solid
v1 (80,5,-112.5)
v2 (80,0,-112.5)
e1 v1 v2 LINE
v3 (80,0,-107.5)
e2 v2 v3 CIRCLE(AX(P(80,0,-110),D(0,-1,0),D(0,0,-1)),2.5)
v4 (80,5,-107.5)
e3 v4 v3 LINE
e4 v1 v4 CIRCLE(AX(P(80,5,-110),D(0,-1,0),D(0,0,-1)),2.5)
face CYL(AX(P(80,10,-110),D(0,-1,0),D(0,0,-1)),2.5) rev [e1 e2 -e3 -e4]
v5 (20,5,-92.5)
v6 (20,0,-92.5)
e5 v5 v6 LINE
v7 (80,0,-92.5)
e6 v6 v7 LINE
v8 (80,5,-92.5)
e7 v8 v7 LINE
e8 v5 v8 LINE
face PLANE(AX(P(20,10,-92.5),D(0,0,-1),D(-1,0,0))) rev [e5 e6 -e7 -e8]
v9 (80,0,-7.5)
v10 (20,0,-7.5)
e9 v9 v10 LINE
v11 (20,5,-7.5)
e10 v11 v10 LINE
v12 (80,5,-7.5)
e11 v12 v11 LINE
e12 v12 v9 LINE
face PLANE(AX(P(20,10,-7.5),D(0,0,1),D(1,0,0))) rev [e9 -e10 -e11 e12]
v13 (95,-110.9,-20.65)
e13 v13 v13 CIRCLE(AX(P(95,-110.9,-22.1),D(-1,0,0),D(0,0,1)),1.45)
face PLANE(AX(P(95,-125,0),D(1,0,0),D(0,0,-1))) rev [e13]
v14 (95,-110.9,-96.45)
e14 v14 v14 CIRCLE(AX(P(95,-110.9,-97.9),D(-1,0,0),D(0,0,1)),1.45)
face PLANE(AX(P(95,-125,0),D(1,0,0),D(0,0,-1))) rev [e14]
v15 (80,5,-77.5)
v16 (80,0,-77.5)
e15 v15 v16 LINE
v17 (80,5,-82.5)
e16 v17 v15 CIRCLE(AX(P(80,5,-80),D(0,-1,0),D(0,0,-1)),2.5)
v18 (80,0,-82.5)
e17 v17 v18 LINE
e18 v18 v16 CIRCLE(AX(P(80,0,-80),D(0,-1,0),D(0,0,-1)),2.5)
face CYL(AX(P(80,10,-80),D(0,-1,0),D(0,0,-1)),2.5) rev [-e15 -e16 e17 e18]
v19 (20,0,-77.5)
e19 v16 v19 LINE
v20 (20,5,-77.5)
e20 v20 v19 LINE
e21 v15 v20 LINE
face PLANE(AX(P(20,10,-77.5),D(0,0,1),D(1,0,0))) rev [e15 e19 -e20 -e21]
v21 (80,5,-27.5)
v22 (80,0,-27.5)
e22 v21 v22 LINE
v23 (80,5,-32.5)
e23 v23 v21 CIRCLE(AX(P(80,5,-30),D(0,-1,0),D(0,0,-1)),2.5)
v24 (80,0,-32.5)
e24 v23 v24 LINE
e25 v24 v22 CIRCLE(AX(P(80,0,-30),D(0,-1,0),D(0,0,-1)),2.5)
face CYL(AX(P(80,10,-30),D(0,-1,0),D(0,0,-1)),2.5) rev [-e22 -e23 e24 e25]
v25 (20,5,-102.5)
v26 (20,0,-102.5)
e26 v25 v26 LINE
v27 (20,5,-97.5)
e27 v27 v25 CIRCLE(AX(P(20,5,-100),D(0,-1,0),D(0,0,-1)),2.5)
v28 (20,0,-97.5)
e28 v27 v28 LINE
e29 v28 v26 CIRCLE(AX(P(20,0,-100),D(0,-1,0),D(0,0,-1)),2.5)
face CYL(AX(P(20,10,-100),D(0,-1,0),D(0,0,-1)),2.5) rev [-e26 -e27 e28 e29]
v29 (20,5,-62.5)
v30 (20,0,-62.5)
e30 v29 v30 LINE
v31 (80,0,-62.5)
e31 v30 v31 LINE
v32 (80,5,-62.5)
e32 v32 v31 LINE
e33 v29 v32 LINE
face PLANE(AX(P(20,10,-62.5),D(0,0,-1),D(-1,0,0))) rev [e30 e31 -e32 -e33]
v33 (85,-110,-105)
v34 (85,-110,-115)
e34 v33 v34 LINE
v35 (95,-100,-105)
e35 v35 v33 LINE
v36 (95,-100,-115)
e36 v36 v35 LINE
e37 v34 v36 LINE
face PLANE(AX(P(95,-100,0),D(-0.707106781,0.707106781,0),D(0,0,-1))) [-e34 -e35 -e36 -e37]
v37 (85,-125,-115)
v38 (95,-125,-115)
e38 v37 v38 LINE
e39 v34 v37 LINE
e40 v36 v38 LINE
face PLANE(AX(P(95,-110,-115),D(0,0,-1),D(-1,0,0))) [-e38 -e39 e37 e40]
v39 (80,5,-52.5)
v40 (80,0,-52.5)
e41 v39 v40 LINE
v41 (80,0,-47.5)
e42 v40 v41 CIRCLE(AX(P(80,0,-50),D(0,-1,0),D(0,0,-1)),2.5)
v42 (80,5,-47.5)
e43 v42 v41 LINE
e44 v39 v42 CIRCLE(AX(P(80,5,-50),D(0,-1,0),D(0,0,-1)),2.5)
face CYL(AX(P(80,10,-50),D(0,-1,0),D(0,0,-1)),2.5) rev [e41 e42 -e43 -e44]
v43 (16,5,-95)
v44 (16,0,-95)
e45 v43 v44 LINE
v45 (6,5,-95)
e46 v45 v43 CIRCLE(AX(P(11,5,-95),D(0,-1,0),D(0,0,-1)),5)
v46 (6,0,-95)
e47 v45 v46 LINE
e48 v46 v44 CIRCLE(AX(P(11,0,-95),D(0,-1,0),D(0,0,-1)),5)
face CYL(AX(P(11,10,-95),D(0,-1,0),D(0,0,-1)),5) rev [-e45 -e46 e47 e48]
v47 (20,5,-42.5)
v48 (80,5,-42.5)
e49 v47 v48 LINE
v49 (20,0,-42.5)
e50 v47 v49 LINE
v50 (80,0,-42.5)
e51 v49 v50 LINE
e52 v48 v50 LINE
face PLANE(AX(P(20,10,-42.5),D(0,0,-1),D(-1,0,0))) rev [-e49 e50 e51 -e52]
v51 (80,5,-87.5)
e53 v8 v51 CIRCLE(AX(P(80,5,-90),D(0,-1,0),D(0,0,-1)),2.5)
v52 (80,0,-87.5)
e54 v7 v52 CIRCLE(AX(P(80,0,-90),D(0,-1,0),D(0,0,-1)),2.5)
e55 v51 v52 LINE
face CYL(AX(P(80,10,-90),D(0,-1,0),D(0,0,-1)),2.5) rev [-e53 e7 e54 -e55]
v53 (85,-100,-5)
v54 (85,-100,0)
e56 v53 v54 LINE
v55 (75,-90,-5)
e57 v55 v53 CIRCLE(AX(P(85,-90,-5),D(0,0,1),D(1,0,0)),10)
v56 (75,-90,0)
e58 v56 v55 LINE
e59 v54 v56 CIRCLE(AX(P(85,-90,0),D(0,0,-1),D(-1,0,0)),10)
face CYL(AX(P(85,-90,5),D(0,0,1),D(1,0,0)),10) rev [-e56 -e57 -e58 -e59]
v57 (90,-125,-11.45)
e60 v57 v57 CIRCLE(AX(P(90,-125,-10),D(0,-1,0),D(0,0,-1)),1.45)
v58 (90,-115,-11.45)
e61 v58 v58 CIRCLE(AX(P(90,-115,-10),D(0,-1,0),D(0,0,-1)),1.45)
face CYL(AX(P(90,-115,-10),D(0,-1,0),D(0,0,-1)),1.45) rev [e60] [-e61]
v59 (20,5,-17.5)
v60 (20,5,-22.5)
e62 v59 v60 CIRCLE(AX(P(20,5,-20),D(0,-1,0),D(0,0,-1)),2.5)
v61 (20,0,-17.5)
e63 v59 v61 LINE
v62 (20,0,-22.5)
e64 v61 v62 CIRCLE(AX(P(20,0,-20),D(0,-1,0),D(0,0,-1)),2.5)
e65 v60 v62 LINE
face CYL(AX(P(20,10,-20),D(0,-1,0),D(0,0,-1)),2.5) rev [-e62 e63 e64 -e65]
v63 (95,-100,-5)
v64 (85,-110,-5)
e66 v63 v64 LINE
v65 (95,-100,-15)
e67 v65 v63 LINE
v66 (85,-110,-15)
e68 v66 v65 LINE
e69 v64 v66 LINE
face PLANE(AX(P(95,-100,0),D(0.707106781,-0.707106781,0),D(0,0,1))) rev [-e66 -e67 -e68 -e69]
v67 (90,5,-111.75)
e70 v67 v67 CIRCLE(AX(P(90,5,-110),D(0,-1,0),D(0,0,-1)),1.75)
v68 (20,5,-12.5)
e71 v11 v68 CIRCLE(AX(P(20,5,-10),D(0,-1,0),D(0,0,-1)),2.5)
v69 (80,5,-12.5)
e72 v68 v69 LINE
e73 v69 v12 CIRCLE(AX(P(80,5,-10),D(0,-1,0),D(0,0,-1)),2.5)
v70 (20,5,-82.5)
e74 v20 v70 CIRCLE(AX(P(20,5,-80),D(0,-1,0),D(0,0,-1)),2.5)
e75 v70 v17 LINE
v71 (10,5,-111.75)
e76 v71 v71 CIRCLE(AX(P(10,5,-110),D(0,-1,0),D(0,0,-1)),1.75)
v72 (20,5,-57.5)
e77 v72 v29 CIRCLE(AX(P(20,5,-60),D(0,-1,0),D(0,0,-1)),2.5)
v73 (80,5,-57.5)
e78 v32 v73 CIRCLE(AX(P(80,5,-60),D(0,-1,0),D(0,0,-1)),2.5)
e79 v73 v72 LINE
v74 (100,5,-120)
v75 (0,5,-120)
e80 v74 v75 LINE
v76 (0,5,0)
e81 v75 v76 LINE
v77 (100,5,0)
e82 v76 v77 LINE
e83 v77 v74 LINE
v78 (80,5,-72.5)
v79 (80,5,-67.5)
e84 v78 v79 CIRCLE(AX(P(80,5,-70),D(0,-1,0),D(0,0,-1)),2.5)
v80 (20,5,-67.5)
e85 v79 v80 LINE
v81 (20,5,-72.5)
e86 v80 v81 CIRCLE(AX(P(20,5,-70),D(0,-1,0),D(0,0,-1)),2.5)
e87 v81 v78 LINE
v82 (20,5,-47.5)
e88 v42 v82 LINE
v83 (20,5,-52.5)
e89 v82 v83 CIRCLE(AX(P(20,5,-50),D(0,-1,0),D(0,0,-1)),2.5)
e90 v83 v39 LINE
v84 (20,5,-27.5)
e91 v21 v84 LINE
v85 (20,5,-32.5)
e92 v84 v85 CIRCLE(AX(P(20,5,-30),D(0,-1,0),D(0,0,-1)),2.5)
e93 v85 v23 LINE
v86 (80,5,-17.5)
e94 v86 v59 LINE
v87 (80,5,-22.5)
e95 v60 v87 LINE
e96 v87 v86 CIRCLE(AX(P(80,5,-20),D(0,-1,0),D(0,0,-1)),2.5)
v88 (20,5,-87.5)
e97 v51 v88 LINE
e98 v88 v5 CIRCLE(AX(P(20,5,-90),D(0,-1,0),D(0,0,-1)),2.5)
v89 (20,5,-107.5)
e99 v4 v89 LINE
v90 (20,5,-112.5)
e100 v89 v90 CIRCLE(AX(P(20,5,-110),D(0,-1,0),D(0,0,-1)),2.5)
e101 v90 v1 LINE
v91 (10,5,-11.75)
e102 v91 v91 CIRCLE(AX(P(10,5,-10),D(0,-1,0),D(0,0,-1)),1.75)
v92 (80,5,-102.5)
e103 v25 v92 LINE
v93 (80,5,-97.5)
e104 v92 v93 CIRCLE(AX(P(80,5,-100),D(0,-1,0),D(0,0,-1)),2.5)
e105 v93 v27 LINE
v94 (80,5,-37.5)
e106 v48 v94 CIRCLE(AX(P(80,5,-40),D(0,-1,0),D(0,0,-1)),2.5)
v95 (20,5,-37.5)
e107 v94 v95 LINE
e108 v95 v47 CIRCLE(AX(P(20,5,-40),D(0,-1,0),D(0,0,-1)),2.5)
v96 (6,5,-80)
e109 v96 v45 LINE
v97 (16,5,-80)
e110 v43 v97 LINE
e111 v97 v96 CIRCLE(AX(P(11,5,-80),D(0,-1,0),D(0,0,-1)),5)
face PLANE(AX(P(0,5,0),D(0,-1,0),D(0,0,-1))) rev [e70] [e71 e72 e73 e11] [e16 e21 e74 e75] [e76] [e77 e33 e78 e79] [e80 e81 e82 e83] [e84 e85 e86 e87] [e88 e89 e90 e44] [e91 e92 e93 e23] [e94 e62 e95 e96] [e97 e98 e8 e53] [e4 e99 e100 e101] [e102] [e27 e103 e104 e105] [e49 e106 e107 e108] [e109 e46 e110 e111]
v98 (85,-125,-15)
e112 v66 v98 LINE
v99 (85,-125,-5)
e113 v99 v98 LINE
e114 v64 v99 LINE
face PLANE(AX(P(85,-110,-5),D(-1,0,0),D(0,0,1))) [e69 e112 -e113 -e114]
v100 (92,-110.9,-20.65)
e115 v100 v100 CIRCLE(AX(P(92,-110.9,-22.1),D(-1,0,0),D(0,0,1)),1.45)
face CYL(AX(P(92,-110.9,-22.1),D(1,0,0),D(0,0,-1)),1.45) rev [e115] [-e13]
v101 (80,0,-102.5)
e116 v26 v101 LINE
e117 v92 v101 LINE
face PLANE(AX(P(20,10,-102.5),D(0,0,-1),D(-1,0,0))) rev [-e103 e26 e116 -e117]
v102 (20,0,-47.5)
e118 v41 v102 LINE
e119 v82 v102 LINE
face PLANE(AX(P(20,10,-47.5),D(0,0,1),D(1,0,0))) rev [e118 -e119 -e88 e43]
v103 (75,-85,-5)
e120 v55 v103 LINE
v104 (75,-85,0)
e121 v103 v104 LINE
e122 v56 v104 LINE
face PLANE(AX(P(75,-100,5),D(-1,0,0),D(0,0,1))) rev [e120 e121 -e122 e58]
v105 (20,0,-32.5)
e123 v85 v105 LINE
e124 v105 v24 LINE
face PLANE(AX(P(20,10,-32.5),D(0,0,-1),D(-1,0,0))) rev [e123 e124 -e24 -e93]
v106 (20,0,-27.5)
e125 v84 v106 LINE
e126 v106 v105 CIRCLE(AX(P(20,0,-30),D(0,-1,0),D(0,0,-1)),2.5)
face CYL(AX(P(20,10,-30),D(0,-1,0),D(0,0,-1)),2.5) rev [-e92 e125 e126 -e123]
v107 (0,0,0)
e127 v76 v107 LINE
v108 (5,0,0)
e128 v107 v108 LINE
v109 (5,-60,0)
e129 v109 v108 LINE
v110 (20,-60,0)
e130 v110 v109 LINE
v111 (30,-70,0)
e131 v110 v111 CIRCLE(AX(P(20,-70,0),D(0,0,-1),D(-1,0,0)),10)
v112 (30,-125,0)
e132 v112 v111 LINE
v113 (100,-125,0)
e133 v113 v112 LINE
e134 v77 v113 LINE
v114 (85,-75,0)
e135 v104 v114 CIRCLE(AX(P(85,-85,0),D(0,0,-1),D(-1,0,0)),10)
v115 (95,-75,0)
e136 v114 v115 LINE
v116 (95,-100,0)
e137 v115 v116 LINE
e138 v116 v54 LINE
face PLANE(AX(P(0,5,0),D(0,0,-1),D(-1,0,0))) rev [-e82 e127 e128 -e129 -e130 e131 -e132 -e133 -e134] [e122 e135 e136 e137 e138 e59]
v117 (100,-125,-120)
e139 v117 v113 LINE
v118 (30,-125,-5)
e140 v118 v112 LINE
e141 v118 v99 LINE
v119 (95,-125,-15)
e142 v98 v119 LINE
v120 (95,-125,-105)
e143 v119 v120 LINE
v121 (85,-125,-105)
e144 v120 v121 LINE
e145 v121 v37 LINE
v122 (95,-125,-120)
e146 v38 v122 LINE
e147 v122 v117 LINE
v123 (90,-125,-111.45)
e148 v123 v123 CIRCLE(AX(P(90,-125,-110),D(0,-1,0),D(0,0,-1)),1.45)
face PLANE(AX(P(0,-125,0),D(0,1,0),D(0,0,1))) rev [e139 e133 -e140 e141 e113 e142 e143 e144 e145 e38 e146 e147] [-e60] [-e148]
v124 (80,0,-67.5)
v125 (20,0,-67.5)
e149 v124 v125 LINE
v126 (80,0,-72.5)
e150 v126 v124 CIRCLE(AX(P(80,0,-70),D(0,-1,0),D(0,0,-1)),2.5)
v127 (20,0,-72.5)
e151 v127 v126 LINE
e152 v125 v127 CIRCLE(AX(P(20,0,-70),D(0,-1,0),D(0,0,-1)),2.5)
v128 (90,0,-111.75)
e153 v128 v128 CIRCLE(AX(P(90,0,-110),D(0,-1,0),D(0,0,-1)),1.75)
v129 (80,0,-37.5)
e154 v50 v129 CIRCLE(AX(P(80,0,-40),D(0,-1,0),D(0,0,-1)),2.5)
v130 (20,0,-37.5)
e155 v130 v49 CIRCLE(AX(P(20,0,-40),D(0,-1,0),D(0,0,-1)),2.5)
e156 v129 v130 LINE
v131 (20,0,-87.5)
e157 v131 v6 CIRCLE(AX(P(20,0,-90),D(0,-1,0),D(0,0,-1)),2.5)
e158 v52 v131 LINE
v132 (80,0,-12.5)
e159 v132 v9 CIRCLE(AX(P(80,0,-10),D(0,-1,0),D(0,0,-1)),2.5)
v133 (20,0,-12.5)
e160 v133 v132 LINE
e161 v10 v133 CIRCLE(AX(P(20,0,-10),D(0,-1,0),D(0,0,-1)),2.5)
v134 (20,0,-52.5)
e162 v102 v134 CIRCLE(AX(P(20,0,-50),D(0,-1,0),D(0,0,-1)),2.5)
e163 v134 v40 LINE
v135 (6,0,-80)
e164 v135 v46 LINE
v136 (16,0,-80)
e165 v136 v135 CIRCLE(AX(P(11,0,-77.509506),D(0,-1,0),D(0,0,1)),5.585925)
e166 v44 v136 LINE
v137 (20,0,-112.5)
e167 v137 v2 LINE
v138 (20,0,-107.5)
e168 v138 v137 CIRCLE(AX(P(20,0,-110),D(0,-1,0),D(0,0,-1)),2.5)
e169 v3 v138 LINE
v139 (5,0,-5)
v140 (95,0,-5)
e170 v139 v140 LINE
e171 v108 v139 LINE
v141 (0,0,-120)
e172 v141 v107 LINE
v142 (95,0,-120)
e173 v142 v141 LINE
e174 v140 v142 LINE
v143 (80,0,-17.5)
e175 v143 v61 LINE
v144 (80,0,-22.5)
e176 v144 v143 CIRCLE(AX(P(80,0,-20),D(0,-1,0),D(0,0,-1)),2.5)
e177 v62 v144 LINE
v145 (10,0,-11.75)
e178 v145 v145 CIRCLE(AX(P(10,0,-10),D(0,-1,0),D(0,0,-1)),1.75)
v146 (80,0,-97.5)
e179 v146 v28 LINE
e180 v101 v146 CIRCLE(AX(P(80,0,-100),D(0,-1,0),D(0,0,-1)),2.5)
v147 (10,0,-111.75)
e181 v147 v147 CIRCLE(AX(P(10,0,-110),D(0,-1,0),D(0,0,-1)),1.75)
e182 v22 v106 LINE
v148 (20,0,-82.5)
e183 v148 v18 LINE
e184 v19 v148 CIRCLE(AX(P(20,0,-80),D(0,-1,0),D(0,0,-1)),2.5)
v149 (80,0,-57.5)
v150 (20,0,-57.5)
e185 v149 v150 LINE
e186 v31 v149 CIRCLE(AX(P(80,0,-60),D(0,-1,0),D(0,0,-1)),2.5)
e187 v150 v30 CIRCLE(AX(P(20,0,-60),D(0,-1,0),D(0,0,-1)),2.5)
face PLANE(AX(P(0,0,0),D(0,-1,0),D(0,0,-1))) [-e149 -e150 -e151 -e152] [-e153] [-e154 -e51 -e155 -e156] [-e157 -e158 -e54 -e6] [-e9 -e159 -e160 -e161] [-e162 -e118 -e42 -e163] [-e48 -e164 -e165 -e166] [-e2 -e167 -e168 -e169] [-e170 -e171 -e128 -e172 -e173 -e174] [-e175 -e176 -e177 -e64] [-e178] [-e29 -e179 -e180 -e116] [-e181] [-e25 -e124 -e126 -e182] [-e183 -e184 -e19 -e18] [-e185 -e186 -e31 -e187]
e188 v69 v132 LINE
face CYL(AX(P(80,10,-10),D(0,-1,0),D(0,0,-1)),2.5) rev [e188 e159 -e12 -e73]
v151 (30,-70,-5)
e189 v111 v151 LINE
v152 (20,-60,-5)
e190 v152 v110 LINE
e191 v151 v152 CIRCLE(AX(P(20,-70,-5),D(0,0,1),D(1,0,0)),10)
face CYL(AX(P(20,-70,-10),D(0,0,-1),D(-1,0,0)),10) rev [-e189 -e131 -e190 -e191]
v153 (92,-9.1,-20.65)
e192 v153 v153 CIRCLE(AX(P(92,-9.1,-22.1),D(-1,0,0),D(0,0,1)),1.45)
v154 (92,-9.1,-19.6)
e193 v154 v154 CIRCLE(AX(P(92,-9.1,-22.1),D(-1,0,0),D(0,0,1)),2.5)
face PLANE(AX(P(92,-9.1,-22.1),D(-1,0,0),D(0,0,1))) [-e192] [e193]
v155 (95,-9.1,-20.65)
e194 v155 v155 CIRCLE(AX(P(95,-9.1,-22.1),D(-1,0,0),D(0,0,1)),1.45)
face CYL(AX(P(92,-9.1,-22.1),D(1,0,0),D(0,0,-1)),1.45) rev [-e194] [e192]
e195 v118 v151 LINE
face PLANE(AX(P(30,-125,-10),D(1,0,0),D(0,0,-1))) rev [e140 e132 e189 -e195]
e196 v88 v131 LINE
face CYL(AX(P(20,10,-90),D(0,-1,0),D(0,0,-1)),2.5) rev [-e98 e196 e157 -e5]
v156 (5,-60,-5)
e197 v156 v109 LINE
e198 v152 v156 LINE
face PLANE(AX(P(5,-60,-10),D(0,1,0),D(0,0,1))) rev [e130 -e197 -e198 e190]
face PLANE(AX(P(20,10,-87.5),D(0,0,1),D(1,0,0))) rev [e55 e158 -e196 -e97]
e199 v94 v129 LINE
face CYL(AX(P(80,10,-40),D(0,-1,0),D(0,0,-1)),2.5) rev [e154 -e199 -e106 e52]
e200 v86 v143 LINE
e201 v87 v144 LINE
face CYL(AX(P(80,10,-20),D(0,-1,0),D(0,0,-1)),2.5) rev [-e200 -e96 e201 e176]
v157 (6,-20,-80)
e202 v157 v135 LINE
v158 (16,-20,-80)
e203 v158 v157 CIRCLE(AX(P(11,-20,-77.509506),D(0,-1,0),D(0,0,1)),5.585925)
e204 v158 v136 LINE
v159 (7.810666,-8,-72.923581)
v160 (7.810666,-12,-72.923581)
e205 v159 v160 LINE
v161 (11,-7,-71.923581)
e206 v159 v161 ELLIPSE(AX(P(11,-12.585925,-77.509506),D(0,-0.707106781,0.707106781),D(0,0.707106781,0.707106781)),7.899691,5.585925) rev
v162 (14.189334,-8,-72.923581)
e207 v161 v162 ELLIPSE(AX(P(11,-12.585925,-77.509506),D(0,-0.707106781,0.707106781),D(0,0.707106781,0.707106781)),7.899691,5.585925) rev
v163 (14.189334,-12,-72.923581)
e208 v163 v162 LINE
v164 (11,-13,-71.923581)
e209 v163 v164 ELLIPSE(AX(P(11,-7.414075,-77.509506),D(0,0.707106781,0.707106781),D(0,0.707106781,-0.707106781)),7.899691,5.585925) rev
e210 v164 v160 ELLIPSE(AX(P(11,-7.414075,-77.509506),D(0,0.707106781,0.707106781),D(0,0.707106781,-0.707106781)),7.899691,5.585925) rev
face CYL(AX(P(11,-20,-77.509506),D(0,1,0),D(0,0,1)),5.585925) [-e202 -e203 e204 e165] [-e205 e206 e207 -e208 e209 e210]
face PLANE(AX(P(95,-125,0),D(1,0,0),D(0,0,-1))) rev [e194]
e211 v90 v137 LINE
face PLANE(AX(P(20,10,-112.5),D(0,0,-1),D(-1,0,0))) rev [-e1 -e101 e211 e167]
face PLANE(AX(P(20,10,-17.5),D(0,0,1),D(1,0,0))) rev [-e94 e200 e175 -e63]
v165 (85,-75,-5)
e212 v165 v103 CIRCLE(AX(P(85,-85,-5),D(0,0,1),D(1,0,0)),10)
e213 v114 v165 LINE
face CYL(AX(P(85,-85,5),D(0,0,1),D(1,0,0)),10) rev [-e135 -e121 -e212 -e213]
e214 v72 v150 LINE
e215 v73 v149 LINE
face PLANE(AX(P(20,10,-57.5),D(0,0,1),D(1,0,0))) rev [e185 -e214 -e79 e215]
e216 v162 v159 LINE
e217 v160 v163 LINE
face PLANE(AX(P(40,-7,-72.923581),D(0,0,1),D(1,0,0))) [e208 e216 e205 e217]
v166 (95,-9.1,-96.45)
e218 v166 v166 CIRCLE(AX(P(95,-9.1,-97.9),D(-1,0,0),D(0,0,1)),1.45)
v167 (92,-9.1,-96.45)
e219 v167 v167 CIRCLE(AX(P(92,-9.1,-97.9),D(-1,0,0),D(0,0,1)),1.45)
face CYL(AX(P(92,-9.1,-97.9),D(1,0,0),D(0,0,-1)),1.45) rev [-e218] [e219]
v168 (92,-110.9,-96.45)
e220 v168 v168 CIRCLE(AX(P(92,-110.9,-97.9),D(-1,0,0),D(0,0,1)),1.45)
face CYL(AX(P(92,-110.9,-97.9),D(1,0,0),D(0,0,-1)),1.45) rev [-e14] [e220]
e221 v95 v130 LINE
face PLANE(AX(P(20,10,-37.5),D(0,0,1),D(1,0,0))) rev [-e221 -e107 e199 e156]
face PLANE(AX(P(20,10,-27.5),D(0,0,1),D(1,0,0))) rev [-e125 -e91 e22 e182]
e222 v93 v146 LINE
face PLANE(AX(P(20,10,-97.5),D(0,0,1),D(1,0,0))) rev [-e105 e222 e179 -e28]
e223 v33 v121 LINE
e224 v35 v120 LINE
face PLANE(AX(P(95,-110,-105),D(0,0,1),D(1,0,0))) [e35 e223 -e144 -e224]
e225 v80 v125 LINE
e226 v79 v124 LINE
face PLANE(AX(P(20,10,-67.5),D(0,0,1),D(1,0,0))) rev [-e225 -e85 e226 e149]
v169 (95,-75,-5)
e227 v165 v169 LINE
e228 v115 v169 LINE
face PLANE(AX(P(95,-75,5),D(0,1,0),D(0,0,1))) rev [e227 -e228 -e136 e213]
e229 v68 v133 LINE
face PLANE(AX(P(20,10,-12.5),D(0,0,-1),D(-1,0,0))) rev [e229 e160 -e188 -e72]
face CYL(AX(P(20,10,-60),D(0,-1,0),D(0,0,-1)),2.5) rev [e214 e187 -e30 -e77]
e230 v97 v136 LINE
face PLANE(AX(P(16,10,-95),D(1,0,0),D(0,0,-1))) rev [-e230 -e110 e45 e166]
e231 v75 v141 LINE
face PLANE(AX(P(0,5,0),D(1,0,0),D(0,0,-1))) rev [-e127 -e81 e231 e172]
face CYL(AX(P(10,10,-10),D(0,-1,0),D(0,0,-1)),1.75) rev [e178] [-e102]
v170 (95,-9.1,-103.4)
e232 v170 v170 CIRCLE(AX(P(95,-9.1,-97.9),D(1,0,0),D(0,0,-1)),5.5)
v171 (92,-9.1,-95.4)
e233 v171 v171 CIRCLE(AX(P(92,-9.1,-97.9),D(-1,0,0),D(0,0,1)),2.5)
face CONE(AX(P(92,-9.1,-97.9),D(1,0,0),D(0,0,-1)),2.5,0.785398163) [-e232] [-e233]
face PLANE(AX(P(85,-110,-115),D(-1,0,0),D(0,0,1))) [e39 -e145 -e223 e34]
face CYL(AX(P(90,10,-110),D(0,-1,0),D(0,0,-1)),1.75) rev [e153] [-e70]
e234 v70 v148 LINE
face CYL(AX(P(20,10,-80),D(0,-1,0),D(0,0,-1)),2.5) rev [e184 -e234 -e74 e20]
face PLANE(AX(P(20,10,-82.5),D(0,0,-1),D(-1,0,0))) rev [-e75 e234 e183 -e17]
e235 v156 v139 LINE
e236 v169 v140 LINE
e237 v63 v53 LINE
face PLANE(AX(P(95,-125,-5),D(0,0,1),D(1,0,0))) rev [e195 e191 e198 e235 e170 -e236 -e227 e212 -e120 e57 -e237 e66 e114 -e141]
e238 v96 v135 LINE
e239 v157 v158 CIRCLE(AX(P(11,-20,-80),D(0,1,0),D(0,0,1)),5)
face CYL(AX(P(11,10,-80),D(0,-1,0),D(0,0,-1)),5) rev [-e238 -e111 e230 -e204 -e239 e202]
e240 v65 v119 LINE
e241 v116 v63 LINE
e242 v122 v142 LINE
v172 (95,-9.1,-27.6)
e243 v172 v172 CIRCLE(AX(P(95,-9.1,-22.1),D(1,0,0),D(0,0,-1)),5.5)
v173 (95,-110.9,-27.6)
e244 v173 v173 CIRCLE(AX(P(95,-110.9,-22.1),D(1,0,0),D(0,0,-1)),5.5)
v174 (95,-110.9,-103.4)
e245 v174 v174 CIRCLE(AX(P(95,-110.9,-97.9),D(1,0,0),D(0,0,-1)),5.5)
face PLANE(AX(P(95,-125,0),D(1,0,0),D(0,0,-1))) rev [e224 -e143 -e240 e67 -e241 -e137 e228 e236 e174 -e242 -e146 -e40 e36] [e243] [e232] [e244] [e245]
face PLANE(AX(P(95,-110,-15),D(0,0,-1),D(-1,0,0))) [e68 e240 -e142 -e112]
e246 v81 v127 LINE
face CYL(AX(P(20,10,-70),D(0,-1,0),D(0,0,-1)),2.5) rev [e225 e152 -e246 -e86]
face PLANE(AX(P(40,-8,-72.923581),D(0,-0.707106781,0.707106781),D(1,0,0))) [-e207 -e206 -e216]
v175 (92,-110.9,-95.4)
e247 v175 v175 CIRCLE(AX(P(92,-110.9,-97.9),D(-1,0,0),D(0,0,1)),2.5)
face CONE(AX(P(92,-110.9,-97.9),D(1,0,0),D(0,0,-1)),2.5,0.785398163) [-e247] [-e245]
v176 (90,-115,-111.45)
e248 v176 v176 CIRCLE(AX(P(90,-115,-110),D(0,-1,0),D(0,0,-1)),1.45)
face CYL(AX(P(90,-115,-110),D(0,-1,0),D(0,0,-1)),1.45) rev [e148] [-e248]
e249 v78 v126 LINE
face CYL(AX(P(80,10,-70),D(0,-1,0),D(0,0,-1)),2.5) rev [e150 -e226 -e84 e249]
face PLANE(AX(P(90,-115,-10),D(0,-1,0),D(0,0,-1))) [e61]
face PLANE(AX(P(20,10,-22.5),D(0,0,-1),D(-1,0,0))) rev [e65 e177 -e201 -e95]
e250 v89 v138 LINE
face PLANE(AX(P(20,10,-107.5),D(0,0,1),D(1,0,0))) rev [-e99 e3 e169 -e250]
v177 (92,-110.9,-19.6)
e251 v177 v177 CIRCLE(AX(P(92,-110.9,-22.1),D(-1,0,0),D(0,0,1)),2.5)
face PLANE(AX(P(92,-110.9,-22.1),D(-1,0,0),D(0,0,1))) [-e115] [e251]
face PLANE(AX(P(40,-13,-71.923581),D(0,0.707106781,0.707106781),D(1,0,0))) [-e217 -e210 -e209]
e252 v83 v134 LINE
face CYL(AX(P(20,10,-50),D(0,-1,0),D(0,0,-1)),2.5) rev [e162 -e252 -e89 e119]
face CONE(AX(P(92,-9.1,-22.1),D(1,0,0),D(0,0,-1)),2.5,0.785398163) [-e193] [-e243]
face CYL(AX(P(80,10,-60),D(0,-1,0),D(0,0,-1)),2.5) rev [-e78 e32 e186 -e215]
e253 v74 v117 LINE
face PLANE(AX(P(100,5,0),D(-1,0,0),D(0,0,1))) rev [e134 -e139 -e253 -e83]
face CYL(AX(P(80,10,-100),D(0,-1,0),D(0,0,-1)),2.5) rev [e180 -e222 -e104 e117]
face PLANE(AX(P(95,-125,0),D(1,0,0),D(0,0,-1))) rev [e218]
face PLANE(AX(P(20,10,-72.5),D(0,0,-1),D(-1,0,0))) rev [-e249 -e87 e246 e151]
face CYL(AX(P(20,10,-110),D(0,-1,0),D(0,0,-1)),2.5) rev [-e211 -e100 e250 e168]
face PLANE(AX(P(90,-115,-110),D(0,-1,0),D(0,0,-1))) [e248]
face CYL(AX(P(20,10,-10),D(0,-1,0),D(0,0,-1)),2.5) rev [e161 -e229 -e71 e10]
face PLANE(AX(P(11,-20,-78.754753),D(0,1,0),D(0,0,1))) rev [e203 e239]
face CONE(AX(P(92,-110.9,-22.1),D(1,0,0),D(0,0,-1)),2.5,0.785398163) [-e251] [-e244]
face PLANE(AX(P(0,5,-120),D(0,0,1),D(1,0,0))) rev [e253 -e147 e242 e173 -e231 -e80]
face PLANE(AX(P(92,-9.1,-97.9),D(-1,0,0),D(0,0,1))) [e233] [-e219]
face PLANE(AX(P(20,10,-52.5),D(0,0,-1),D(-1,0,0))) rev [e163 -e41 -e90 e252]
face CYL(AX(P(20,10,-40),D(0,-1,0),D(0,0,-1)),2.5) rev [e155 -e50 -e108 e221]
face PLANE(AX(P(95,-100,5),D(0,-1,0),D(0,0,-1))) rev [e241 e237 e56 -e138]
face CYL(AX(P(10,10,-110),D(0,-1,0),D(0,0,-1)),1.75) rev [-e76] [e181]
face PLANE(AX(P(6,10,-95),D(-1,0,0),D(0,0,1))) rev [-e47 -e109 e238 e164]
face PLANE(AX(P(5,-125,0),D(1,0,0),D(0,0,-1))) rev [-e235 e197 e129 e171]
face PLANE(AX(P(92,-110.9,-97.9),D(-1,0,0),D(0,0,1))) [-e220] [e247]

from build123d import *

# Parameters (mm, degrees)
SKETCH2_W           = 100
SKETCH2_H           = 120
BOSS_EXTRUDE1_DEPTH = 5
SKETCH3_W           = 5
SKETCH3_H           = 120
BOSS_EXTRUDE2_DEPTH = 125
SKETCH4_W           = 90
SKETCH4_H           = 5
BOSS_EXTRUDE3_DEPTH = 125
SKETCH5_W           = 10
SKETCH5_H           = 10
BOSS_EXTRUDE4_DEPTH = 15
SKETCH6_R           = 1.45
CUT_EXTRUDE1_DEPTH  = 10
CHAMFER1_SIZE       = 10
CUT_EXTRUDE2_DEPTH  = 10
SKETCH8_W           = 25
SKETCH8_H           = 65
CUT_EXTRUDE3_DEPTH  = 10
SKETCH9_R           = 1.75
CUT_EXTRUDE4_DEPTH  = 10
CUT_EXTRUDE5_DEPTH  = 10
BOSS_EXTRUDE5_START = 20
BOSS_EXTRUDE5_DEPTH = 20
SKETCH12_W          = 1
SKETCH12_H          = 6
CUT_EXTRUDE6_DEPTH  = 40
CHAMFER2_SIZE       = 1
SKETCH13_R          = 2.5
SKETCH13_R_2        = 1.45
BOSS_EXTRUDE6_DEPTH = 3
CHAMFER3_SIZE       = 3
SKETCH14_W          = 20
SKETCH14_H          = 25
CUT_EXTRUDE7_DEPTH  = 10
FILLET1_R           = 10


with BuildPart() as part:
    # Sketch2 → Boss-Extrude1 (new body)
    with BuildSketch(Plane(origin=(0, 0, 0), x_dir=(1, 0, 0), z_dir=(0, 1, 0))):
        with Locations((50, 60)):
            Rectangle(SKETCH2_W, SKETCH2_H)
    extrude(amount=BOSS_EXTRUDE1_DEPTH)

    # Sketch3 → Boss-Extrude2 (add)
    with BuildSketch(Plane.XZ):
        with Locations((97.5, -60)):
            Rectangle(SKETCH3_W, SKETCH3_H)
    extrude(amount=BOSS_EXTRUDE2_DEPTH)

    # Sketch4 → Boss-Extrude3 (add)
    with BuildSketch(Plane.XZ):
        with Locations((50, -2.5)):
            Rectangle(SKETCH4_W, SKETCH4_H)
    extrude(amount=BOSS_EXTRUDE3_DEPTH)

    # Sketch5 → Boss-Extrude4 (add)
    with BuildSketch(Plane.XZ.offset(125)):
        with Locations((90, -10)):
            Rectangle(SKETCH5_W, SKETCH5_H)
        with Locations((90, -110)):
            Rectangle(SKETCH5_W, SKETCH5_H)
    extrude(amount=-BOSS_EXTRUDE4_DEPTH)

    # Sketch6 → Cut-Extrude1 (cut)
    with BuildSketch(Plane.XZ.offset(125)):
        with Locations(Location((90, -10, 0), (0, 0, 270))):
            Circle(SKETCH6_R)
        with Locations(Location((90, -110, 0), (0, 0, 270))):
            Circle(SKETCH6_R)
    extrude(amount=-CUT_EXTRUDE1_DEPTH, mode=Mode.SUBTRACT)

    # Chamfer1
    chamfer1_edges = [part.edges().sort_by_distance(p)[0] for p in [
        (95, -110, -110),
        (95, -110, -10),
    ]]
    chamfer(chamfer1_edges, length=CHAMFER1_SIZE - 0.0001)  # a hair under: the kernel refuses the full size

    # Sketch7 → Cut-Extrude2 (cut)
    with BuildSketch(Plane.XZ):
        with BuildLine():
            Line((20, -7.5), (80, -7.5))
            ThreePointArc((80, -7.5), (82.5, -10), (80, -12.5))
            Line((80, -12.5), (20, -12.5))
            ThreePointArc((20, -12.5), (17.5, -10), (20, -7.5))
        make_face()
        with BuildLine():
            Line((20, -17.5), (80, -17.5))
            ThreePointArc((80, -17.5), (82.5, -20), (80, -22.5))
            Line((80, -22.5), (20, -22.5))
            ThreePointArc((20, -22.5), (17.5, -20), (20, -17.5))
        make_face()
        with BuildLine():
            Line((20, -27.5), (80, -27.5))
            ThreePointArc((80, -27.5), (82.5, -30), (80, -32.5))
            Line((80, -32.5), (20, -32.5))
            ThreePointArc((20, -32.5), (17.5, -30), (20, -27.5))
        make_face()
        with BuildLine():
            Line((20, -37.5), (80, -37.5))
            ThreePointArc((80, -37.5), (82.5, -40), (80, -42.5))
            Line((80, -42.5), (20, -42.5))
            ThreePointArc((20, -42.5), (17.5, -40), (20, -37.5))
        make_face()
        with BuildLine():
            Line((20, -47.5), (80, -47.5))
            ThreePointArc((80, -47.5), (82.5, -50), (80, -52.5))
            Line((80, -52.5), (20, -52.5))
            ThreePointArc((20, -52.5), (17.5, -50), (20, -47.5))
        make_face()
        with BuildLine():
            Line((20, -57.5), (80, -57.5))
            ThreePointArc((80, -57.5), (82.5, -60), (80, -62.5))
            Line((80, -62.5), (20, -62.5))
            ThreePointArc((20, -62.5), (17.5, -60), (20, -57.5))
        make_face()
        with BuildLine():
            Line((20, -67.5), (80, -67.5))
            ThreePointArc((80, -67.5), (82.5, -70), (80, -72.5))
            Line((80, -72.5), (20, -72.5))
            ThreePointArc((20, -72.5), (17.5, -70), (20, -67.5))
        make_face()
        with BuildLine():
            Line((20, -77.5), (80, -77.5))
            ThreePointArc((80, -77.5), (82.5, -80), (80, -82.5))
            Line((80, -82.5), (20, -82.5))
            ThreePointArc((20, -82.5), (17.5, -80), (20, -77.5))
        make_face()
        with BuildLine():
            Line((20, -87.5), (80, -87.5))
            ThreePointArc((80, -87.5), (82.5, -90), (80, -92.5))
            Line((80, -92.5), (20, -92.5))
            ThreePointArc((20, -92.5), (17.5, -90), (20, -87.5))
        make_face()
        with BuildLine():
            Line((20, -97.5), (80, -97.5))
            ThreePointArc((80, -97.5), (82.5, -100), (80, -102.5))
            Line((80, -102.5), (20, -102.5))
            ThreePointArc((20, -102.5), (17.5, -100), (20, -97.5))
        make_face()
        with BuildLine():
            Line((20, -107.5), (80, -107.5))
            ThreePointArc((80, -107.5), (82.5, -110), (80, -112.5))
            Line((80, -112.5), (20, -112.5))
            ThreePointArc((20, -112.5), (17.5, -110), (20, -107.5))
        make_face()
    extrude(amount=-CUT_EXTRUDE2_DEPTH, mode=Mode.SUBTRACT)

    # Sketch8 → Cut-Extrude3 (cut)
    with BuildSketch(Plane.XY):
        with Locations((17.5, -92.5)):
            Rectangle(SKETCH8_W, SKETCH8_H)
    extrude(amount=-CUT_EXTRUDE3_DEPTH, mode=Mode.SUBTRACT)

    # Sketch9 → Cut-Extrude4 (cut)
    with BuildSketch(Plane.XZ):
        with Locations(Location((10, -110, 0), (0, 0, 270))):
            Circle(SKETCH9_R)
        with Locations(Location((10, -10, 0), (0, 0, 270))):
            Circle(SKETCH9_R)
        with Locations(Location((90, -110, 0), (0, 0, 270))):
            Circle(SKETCH9_R)
    extrude(amount=-CUT_EXTRUDE4_DEPTH, mode=Mode.SUBTRACT)

    # Sketch10 → Cut-Extrude5 (cut)
    with BuildSketch(Plane.XZ):
        with BuildLine():
            Line((6, -95), (6, -80))
            ThreePointArc((6, -80), (11, -75), (16, -80))
            Line((16, -80), (16, -95))
            ThreePointArc((16, -95), (11, -100), (6, -95))
        make_face()
    extrude(amount=-CUT_EXTRUDE5_DEPTH, mode=Mode.SUBTRACT)

    # Sketch11 → Boss-Extrude5 (add)
    with BuildSketch(Plane.XZ.offset(BOSS_EXTRUDE5_START)):
        with BuildLine():
            ThreePointArc((6, -80), (11, -71.923580655), (16, -80))
            ThreePointArc((16, -80), (11, -75), (6, -80))
        make_face()
    extrude(amount=-BOSS_EXTRUDE5_DEPTH)

    # Sketch12 → Cut-Extrude6 (cut)
    with BuildSketch(Plane(origin=(0, 0, 0), x_dir=(0, 0, -1), z_dir=(1, 0, 0))):
        with Locations((72.423580655, -10)):
            Rectangle(SKETCH12_W, SKETCH12_H)
    extrude(amount=CUT_EXTRUDE6_DEPTH, mode=Mode.SUBTRACT)

    # Chamfer2
    chamfer2_edges = [part.edges().sort_by_distance(p)[0] for p in [
        (11, -13, -72.923580655),
        (11, -7, -72.923580655),
    ]]
    chamfer(chamfer2_edges, length=CHAMFER2_SIZE - 0.0001)  # a hair under: the kernel refuses the full size

    # Sketch13 → Boss-Extrude6 (add)
    # profile 1 of 4: a face of its own
    with BuildSketch(Plane.ZY.offset(-95)):
        with Locations(Location((-97.9, -110.9, 0), (0, 0, 180))):
            Circle(SKETCH13_R)
        with Locations((-97.9, -110.9)):
            Circle(SKETCH13_R_2, mode=Mode.SUBTRACT)
    # profile 2 of 4: a face of its own
    with BuildSketch(Plane.ZY.offset(-95)):
        with Locations(Location((-97.9, -9.1, 0), (0, 0, 180))):
            Circle(SKETCH13_R)
        with Locations((-97.9, -9.1)):
            Circle(SKETCH13_R_2, mode=Mode.SUBTRACT)
    # profile 3 of 4: a face of its own
    with BuildSketch(Plane.ZY.offset(-95)):
        with Locations(Location((-22.1, -9.1, 0), (0, 0, 180))):
            Circle(SKETCH13_R)
        with Locations((-22.1, -9.1)):
            Circle(SKETCH13_R_2, mode=Mode.SUBTRACT)
    # profile 4 of 4: a face of its own
    with BuildSketch(Plane.ZY.offset(-95)):
        with Locations(Location((-22.1, -110.9, 0), (0, 0, 180))):
            Circle(SKETCH13_R)
        with Locations((-22.1, -110.9)):
            Circle(SKETCH13_R_2, mode=Mode.SUBTRACT)
    extrude(amount=BOSS_EXTRUDE6_DEPTH)

    # Chamfer3
    chamfer3_edges = [part.edges().sort_by_distance(p)[0] for p in [
        (95, -110.9, -95.4),
        (95, -9.1, -95.4),
        (95, -9.1, -19.6),
        (95, -110.9, -19.6),
    ]]
    chamfer(chamfer3_edges, length=CHAMFER3_SIZE - 0.0001)  # a hair under: the kernel refuses the full size

    # Sketch14 → Cut-Extrude7 (cut)
    with BuildSketch(Plane(origin=(0, 0, -5), x_dir=(-1, 0, 0), z_dir=(0, 0, -1))):
        with Locations((-85, -87.5)):
            Rectangle(SKETCH14_W, SKETCH14_H)
    extrude(amount=-CUT_EXTRUDE7_DEPTH, mode=Mode.SUBTRACT)

    # Fillet1
    fillet1_edges = [part.edges().sort_by_distance(p)[0] for p in [
        (30, -60, -2.5),
        (75, -75, -2.5),
        (75, -100, -2.5),
    ]]
    fillet(fillet1_edges, radius=FILLET1_R)


solid = part.part
